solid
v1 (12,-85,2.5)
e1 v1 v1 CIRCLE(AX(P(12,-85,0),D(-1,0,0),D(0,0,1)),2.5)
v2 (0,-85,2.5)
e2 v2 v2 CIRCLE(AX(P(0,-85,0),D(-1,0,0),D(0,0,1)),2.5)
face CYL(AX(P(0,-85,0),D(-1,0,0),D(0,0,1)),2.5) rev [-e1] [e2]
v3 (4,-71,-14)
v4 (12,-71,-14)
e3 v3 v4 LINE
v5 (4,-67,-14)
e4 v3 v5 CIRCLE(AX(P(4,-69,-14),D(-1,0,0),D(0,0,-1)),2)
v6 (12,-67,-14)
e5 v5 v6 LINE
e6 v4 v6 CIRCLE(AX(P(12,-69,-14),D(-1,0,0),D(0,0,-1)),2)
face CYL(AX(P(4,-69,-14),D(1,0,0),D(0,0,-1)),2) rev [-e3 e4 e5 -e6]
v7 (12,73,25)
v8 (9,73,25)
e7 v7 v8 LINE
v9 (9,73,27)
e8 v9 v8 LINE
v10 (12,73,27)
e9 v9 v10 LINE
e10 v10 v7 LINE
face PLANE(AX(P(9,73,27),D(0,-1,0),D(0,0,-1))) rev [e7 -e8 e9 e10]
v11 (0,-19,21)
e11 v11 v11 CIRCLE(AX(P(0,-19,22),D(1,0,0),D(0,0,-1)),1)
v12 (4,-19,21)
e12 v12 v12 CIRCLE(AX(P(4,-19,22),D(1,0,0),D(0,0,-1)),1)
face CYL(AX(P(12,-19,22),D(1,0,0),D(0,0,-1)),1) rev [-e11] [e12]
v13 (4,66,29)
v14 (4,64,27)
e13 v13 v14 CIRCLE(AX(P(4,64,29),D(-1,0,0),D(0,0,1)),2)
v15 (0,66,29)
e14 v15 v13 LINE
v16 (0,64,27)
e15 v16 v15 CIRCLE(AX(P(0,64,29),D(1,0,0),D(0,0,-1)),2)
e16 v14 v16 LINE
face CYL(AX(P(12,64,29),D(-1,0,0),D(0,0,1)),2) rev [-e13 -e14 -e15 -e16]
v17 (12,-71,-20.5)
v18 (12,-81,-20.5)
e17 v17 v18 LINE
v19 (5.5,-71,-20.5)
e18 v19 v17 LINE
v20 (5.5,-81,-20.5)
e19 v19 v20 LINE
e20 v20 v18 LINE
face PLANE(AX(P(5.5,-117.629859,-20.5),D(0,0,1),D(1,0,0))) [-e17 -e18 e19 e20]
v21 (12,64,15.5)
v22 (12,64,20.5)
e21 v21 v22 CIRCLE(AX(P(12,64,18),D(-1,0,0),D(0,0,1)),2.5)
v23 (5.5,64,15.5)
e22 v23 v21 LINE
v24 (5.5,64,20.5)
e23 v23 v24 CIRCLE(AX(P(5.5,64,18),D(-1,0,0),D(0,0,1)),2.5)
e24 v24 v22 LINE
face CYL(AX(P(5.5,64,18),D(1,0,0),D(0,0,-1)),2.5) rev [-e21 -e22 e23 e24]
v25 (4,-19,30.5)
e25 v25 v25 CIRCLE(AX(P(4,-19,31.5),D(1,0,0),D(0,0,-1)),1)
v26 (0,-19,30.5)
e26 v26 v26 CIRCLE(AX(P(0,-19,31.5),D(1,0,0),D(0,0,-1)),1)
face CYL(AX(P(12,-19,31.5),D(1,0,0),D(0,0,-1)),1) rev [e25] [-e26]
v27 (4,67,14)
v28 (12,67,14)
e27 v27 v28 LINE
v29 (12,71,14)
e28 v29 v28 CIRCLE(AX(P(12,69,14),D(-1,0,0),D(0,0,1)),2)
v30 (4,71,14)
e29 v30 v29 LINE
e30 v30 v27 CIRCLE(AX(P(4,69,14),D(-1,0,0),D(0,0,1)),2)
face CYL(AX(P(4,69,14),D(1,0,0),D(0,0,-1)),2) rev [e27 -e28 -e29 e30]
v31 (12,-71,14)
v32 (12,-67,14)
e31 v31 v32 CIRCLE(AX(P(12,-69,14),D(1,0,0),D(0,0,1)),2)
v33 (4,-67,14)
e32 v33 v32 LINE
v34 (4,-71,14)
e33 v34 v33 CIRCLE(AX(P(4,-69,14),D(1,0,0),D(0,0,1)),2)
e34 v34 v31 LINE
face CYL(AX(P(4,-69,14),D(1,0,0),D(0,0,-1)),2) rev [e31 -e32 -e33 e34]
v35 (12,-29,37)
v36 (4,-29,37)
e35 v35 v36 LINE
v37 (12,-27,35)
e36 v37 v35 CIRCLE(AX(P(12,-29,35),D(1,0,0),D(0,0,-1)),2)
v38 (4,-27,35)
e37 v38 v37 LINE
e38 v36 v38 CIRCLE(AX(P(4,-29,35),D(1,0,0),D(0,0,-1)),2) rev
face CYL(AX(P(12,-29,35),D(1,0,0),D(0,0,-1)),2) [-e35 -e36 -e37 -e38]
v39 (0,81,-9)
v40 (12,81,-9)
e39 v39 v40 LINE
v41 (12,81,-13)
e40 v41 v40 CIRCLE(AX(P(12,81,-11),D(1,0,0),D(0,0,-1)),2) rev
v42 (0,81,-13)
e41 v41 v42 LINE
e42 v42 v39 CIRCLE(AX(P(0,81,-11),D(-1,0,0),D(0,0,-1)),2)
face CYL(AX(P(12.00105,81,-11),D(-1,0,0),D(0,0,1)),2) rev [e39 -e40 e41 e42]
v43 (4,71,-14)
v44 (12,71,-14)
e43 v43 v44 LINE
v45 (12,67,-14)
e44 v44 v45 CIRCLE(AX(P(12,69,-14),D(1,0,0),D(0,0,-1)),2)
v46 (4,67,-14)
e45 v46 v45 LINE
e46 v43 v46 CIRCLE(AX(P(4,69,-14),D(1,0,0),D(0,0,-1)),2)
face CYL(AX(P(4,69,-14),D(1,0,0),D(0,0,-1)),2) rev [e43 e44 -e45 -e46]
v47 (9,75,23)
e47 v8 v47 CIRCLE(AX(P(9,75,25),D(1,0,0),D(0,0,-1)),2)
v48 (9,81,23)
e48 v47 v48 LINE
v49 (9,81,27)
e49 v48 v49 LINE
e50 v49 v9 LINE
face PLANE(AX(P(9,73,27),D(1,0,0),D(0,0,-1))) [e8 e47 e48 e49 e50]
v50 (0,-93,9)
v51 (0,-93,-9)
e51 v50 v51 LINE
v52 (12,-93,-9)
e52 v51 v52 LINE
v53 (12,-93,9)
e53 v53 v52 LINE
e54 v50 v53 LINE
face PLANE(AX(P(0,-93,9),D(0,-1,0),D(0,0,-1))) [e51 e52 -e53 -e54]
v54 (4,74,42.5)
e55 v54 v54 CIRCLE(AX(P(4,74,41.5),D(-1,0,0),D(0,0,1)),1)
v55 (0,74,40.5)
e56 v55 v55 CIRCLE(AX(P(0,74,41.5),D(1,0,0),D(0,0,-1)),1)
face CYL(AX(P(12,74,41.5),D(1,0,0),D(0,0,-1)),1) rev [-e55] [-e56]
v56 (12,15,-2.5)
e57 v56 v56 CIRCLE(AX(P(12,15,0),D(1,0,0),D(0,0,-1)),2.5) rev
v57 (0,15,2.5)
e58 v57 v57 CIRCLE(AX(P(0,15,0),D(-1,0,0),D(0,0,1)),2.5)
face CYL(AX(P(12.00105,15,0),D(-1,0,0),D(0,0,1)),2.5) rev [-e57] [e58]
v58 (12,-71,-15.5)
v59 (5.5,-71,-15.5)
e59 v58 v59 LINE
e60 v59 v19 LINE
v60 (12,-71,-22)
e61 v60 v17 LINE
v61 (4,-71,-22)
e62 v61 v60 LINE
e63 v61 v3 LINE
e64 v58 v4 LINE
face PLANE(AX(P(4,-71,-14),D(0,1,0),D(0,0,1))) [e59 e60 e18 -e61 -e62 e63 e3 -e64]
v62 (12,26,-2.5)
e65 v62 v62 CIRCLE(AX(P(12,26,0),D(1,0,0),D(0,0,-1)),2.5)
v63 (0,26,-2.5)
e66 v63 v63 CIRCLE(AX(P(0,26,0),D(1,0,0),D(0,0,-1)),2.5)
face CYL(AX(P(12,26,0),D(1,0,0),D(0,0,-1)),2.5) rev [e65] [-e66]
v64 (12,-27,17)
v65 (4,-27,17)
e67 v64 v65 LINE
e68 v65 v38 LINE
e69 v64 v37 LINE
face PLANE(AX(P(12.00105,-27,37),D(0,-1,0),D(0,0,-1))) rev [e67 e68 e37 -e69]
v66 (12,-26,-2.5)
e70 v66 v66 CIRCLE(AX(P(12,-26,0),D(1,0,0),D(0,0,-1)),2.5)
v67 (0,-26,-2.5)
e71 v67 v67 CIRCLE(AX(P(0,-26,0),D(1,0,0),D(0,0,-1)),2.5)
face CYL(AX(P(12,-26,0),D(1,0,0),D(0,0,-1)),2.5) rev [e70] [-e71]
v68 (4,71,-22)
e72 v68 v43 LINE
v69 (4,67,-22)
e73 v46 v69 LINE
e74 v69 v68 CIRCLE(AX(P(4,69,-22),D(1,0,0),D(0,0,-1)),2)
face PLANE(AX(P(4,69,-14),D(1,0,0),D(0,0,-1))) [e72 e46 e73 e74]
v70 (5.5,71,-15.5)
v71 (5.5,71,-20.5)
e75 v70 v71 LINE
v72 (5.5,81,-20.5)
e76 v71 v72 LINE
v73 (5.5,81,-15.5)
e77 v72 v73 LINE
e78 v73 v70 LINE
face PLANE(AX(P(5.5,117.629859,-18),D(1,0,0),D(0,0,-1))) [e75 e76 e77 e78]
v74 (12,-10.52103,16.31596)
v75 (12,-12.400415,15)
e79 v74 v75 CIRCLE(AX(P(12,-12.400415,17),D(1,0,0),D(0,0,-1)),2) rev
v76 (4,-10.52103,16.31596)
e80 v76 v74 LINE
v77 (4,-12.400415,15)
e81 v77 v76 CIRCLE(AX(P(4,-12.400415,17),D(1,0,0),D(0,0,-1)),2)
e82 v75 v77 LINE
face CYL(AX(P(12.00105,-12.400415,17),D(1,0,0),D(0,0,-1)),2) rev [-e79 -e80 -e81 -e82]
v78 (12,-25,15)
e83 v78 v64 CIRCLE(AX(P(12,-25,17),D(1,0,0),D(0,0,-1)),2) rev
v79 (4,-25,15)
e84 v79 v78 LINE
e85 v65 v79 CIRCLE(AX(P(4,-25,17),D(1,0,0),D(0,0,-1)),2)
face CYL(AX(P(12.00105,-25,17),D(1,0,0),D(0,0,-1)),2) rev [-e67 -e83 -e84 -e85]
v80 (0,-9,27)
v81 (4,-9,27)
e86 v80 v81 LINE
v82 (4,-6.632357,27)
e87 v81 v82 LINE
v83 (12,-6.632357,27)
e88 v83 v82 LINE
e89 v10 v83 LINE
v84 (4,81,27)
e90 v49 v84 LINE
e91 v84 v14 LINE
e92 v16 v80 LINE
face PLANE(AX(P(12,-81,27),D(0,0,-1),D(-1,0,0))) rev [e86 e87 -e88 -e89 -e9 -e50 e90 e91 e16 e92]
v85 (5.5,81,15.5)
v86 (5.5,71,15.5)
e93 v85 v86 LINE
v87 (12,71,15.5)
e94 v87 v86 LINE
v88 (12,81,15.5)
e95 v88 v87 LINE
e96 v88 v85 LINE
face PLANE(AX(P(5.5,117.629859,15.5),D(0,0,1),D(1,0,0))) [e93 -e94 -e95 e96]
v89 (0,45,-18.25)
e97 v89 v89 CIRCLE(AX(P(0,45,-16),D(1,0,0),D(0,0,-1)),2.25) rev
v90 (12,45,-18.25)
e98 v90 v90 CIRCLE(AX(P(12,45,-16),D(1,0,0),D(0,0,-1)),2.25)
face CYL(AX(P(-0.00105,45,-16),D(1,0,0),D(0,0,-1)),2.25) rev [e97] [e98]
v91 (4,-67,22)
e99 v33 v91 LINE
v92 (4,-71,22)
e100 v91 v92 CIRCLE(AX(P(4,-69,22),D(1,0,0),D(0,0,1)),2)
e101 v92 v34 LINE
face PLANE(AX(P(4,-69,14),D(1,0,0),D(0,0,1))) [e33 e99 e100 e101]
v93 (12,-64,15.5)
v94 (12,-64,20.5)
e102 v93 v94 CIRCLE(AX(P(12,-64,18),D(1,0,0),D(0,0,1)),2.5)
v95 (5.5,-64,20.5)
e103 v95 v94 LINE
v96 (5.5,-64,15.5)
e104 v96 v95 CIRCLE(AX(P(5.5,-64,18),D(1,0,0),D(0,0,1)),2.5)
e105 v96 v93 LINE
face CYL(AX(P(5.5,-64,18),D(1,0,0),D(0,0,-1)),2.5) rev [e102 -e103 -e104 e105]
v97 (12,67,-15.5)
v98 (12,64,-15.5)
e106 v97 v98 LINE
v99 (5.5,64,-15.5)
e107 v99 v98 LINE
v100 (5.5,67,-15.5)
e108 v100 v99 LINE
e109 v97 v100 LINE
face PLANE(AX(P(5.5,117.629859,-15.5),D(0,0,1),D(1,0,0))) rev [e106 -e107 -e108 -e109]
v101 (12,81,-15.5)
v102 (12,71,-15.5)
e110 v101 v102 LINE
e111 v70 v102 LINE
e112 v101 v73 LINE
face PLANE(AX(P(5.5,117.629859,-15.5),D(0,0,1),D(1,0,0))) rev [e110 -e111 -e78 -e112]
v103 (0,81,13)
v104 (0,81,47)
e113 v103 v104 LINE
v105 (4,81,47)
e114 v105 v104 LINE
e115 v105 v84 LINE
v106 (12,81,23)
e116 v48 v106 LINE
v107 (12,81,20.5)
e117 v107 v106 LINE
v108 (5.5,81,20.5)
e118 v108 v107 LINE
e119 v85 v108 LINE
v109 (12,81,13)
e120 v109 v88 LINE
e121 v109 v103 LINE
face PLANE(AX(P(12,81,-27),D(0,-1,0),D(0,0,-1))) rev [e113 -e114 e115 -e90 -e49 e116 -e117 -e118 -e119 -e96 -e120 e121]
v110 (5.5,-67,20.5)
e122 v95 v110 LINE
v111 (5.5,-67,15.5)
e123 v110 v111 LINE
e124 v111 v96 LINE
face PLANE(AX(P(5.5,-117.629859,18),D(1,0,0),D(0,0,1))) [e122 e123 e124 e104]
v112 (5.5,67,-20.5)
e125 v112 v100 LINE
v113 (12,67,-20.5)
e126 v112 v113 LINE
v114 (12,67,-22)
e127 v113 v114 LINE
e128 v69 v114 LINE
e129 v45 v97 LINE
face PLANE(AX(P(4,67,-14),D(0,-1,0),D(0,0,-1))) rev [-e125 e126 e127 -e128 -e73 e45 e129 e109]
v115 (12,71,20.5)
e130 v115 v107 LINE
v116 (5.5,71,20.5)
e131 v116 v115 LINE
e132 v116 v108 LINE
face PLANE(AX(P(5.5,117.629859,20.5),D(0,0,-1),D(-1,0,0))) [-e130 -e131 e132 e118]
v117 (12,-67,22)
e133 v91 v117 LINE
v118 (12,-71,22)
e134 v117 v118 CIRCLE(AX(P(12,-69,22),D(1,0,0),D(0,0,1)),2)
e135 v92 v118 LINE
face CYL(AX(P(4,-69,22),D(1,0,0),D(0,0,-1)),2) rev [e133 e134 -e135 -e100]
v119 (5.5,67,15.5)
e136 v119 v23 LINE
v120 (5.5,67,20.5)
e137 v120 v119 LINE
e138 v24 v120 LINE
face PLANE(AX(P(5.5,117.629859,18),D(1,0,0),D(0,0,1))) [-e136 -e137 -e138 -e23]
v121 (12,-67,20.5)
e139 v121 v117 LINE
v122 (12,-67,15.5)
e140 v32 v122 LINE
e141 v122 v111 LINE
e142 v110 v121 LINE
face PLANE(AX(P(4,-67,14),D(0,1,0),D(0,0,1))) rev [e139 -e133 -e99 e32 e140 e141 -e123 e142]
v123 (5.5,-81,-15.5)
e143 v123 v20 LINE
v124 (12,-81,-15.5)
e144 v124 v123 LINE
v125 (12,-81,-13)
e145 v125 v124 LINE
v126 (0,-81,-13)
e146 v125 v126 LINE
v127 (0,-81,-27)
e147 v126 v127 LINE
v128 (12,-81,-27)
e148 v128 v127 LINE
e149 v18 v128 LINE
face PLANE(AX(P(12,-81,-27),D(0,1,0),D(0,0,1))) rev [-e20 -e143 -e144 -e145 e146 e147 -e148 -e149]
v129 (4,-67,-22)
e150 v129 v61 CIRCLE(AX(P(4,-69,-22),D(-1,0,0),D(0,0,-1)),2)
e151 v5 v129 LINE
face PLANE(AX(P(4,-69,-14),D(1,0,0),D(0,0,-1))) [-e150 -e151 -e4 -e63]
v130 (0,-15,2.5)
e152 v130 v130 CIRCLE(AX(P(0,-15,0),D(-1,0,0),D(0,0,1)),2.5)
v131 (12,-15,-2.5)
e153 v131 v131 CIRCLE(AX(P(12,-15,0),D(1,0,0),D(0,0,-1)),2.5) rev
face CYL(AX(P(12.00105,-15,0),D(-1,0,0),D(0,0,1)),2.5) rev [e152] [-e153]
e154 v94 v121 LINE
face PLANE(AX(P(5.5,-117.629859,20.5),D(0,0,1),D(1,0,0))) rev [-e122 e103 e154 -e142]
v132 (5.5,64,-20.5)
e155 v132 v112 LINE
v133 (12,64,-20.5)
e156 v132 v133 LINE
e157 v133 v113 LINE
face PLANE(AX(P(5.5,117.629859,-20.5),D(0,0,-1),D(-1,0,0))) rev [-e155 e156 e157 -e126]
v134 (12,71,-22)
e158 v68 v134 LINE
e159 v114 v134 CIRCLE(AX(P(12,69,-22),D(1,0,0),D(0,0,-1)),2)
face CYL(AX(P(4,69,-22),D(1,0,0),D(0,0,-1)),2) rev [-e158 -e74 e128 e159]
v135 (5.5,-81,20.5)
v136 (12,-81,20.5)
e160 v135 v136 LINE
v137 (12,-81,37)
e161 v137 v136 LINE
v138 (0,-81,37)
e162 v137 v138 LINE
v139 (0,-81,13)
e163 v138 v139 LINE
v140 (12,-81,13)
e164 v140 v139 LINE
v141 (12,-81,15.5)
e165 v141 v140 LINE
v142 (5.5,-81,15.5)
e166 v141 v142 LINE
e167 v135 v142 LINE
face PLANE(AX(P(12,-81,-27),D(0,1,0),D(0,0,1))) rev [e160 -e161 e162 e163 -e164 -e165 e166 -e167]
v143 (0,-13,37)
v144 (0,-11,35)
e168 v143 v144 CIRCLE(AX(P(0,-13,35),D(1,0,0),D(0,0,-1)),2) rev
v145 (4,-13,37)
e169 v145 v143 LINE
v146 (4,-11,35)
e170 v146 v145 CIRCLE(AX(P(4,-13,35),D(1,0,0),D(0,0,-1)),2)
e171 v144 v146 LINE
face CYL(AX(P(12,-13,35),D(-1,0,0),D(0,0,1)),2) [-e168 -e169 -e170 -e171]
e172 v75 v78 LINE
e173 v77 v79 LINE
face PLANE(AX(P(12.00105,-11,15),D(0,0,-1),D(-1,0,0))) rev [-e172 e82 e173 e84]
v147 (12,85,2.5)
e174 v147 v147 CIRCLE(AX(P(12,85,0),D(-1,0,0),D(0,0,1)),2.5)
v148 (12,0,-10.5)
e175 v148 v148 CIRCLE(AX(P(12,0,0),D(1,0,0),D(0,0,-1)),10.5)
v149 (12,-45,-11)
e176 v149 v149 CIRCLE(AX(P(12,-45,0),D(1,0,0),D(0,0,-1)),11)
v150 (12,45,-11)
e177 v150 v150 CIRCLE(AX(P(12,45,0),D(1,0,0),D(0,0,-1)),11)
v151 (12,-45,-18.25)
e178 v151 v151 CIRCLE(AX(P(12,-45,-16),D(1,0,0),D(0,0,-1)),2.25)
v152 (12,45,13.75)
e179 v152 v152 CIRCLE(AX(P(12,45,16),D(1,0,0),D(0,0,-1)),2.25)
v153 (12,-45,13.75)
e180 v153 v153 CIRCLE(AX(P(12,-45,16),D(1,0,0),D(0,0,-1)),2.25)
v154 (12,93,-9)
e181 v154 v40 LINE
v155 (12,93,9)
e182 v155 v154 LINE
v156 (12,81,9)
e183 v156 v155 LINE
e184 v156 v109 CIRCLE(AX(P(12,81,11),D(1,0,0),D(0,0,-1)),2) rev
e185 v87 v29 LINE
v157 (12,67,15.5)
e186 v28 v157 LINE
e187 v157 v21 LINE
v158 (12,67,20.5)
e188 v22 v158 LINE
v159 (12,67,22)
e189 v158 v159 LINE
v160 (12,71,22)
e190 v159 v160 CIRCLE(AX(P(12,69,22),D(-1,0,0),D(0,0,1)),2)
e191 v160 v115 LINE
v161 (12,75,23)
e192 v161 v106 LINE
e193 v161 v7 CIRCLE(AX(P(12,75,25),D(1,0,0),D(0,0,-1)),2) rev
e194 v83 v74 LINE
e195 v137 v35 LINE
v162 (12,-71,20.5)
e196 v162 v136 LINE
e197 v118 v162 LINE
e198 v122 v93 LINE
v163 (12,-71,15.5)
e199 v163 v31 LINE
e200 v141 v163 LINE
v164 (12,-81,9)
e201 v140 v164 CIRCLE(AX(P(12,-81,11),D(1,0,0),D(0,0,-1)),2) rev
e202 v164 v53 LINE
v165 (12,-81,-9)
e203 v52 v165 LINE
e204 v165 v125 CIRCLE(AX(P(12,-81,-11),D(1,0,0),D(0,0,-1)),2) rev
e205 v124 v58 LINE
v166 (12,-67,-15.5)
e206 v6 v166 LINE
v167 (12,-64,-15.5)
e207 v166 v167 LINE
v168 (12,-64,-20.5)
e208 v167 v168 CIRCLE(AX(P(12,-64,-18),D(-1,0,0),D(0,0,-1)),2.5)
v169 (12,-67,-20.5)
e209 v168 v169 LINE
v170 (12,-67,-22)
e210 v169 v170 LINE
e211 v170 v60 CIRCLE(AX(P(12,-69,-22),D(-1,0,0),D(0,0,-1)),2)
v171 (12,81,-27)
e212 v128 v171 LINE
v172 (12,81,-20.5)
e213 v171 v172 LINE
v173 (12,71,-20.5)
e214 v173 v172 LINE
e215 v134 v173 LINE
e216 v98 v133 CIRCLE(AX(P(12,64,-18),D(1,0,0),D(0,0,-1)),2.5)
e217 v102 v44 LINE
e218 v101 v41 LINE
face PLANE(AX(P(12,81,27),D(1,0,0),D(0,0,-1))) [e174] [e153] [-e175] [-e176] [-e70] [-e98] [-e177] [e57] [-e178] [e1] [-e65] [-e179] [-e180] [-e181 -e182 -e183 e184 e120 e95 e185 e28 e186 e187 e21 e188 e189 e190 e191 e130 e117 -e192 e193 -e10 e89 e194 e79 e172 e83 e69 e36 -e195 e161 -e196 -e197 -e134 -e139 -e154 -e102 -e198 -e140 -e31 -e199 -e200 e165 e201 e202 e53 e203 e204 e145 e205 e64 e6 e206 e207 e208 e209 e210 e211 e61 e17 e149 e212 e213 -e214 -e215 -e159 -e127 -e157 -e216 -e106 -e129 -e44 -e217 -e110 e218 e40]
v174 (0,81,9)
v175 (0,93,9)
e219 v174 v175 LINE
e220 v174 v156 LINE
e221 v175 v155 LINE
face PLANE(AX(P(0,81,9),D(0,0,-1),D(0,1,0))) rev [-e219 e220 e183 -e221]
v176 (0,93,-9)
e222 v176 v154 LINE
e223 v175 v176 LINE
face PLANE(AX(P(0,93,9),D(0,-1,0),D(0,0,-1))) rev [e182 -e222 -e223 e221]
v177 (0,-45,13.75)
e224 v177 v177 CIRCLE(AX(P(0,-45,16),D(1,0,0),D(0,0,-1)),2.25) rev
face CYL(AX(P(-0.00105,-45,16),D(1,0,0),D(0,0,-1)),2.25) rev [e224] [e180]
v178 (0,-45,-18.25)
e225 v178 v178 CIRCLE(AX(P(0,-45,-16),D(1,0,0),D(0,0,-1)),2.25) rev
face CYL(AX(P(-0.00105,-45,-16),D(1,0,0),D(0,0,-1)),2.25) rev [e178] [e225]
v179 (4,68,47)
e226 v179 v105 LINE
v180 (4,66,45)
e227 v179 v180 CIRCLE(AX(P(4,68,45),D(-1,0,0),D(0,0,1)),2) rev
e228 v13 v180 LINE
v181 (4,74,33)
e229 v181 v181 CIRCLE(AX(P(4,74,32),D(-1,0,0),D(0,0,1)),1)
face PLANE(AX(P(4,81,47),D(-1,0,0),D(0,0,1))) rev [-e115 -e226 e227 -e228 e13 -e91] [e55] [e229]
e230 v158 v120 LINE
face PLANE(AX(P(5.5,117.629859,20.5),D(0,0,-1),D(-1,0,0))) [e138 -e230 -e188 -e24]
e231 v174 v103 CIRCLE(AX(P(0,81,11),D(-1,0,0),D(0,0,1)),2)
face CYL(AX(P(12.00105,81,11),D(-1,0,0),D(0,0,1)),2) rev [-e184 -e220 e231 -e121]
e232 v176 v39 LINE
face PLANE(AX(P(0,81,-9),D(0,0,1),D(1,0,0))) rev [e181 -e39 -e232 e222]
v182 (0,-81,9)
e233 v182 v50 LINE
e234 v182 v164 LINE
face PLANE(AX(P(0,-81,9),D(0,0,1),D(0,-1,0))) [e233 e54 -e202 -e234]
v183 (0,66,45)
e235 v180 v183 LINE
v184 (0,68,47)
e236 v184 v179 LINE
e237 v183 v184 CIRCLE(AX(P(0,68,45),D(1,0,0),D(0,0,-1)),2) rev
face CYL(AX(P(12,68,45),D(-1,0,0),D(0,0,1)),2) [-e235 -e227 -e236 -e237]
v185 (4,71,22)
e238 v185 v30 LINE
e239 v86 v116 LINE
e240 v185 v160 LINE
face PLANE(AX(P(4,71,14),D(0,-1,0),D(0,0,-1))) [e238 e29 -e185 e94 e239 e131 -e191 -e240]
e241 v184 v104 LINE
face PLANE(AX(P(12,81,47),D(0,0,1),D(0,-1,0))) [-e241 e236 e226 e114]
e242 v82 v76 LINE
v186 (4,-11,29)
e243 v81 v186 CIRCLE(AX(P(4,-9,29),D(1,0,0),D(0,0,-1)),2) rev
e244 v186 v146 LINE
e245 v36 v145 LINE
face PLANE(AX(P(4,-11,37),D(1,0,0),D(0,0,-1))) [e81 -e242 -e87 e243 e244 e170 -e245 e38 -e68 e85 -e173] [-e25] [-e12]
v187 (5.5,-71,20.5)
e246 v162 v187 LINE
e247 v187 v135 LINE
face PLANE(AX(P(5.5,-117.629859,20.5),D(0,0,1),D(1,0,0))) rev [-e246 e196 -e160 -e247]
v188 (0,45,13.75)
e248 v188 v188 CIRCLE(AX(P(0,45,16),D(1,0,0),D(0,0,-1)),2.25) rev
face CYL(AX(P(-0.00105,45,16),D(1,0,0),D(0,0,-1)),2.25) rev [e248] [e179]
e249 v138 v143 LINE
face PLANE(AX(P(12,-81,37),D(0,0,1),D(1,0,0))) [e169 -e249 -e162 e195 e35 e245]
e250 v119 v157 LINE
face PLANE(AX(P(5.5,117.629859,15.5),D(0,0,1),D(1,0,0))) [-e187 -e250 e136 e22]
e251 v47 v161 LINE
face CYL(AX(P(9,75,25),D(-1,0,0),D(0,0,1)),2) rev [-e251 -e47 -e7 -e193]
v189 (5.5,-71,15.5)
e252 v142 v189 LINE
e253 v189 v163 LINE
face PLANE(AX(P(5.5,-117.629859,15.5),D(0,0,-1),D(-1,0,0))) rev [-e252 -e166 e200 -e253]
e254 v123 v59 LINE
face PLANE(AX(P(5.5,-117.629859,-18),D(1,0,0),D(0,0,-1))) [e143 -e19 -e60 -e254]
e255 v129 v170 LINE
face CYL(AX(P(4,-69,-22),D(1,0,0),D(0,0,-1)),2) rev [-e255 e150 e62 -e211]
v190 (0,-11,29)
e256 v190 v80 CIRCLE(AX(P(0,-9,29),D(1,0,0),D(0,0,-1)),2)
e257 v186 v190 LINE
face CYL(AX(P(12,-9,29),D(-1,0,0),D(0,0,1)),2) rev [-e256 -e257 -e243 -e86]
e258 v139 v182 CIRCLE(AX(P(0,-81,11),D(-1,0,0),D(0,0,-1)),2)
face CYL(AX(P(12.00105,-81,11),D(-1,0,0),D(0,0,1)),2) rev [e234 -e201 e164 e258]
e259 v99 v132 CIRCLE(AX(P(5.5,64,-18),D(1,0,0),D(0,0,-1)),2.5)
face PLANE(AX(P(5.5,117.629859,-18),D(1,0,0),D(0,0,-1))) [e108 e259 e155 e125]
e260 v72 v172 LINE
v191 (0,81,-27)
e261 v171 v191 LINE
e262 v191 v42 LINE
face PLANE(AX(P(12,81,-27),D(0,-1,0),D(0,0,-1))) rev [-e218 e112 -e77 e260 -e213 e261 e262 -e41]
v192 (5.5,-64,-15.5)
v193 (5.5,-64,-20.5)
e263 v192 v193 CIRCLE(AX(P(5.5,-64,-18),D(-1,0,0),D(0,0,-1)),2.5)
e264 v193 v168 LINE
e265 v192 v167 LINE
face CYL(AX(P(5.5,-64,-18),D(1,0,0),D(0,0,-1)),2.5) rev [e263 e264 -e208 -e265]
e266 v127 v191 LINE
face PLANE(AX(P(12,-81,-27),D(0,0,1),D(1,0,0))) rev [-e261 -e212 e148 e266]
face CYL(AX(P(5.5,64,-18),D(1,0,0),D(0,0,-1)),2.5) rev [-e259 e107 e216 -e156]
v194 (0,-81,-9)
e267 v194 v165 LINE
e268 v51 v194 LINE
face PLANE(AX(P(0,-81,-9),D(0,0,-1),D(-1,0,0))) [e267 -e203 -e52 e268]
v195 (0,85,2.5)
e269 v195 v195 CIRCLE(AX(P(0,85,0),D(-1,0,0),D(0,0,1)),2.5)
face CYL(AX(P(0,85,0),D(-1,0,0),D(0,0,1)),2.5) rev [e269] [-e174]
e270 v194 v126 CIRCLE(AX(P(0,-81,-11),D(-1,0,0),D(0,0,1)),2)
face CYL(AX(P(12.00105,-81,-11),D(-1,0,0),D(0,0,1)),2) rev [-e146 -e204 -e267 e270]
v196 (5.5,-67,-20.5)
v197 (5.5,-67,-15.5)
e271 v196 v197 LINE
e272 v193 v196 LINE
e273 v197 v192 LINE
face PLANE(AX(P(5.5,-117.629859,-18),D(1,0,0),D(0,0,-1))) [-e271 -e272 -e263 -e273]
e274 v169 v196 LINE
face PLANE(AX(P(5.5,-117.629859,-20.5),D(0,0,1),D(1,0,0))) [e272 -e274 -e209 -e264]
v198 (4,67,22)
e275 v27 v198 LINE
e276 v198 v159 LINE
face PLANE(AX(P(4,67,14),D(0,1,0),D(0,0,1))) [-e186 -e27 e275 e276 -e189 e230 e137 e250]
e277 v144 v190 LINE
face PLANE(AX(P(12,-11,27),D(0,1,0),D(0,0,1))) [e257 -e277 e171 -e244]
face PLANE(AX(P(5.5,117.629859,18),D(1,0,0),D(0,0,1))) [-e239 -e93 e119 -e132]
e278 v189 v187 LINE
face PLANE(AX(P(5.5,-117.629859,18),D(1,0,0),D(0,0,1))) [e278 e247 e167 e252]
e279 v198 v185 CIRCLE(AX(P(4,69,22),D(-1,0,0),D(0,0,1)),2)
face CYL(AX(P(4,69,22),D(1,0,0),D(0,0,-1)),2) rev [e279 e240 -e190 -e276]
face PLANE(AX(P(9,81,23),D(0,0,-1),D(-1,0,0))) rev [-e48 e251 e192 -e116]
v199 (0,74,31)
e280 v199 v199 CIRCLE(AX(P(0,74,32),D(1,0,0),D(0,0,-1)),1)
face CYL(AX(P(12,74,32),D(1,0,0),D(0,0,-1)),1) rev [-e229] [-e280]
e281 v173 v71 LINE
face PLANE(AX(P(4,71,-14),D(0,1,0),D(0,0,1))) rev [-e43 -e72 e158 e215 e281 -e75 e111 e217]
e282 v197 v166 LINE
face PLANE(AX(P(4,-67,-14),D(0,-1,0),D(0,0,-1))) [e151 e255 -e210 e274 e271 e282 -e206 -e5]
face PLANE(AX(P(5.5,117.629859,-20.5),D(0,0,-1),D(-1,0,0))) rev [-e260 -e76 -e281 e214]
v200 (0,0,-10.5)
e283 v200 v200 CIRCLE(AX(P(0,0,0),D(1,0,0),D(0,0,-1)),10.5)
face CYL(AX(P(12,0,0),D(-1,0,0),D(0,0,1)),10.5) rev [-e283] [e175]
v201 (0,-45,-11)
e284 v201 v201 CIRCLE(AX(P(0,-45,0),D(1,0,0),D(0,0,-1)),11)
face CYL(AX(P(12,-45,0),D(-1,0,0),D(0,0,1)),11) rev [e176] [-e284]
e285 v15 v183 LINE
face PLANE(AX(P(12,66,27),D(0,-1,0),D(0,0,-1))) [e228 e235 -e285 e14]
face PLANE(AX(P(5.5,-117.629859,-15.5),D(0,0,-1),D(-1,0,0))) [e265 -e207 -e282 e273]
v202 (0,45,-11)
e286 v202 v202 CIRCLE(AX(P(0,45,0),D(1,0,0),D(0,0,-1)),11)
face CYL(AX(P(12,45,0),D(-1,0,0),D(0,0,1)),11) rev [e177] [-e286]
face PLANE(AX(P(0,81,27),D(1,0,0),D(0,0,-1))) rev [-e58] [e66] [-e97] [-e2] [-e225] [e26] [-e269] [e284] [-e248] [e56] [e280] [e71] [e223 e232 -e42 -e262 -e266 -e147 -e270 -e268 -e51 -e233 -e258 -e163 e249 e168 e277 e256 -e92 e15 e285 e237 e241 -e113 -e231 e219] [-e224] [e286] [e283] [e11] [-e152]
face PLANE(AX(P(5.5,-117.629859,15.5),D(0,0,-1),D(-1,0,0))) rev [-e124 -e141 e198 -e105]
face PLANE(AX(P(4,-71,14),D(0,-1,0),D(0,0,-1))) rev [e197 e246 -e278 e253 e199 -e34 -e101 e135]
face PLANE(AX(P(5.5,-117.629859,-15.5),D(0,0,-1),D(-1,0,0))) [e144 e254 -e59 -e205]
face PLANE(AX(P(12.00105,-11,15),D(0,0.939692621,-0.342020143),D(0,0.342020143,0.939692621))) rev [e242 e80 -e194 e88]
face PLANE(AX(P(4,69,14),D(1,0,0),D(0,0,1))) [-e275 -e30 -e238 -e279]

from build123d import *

# Parameters (mm, degrees)
SKETCH2_W                    = 54
SKETCH2_H                    = 162
SKETCH2_R                    = 10.5
SKETCH2_R_2                  = 11
BOSS_EXTRUDE1_DEPTH          = 12
SKETCH3_W                    = 18
SKETCH3_H                    = 12
BOSS_EXTRUDE2_DEPTH          = 12
CUT_EXTRUDE1_REACH           = 99.581
SKETCH4_R                    = 2.25
LPATTERN1_COUNT              = 2
LPATTERN1_PITCH              = 90
CUT_EXTRUDE14_START          = 4
CUT_EXTRUDE14_DEPTH          = 8
CUT_EXTRUDE15_DEPTH          = 6.5
MIRROR2_START                = 4
MIRROR2_COPY_1_DEPTH         = 8
MIRROR2_COPY_2_DEPTH         = 6.5
CUT_EXTRUDE9_REACH           = 99.581
SKETCH13_R                   = 2.5
SKETCH15_W                   = 20
SKETCH15_H                   = 15
BOSS_EXTRUDE3_DEPTH          = 12
F_2_0_2_DIAMETER_HOLE1_D     = 2
SKETCH19_W                   = 10
SKETCH19_H                   = 70
BOSS_EXTRUDE4_DEPTH          = 12
F_2_0_2_DIAMETER_HOLE2_D     = 2
CUT_EXTRUDE12_REACH          = 110.89
CUT_EXTRUDE12_START          = -4
SKETCH22_W                   = 20
SKETCH22_H                   = 15
FILLET1_R                    = 2
CUT_EXTRUDE13_REACH          = 106.89
F_5_0_5_DIAMETER_HOLE2_D     = 5
F_5_0_5_DIAMETER_HOLE1_D     = 5
F_5_0_5_DIAMETER_HOLE1_DEPTH = 12
F_5_0_5_DIAMETER_HOLE1_TIP   = 1.502151548
SKETCH32_W                   = 4
SKETCH32_H                   = 8
CUT_EXTRUDE16_DEPTH          = 3
FILLET2_R                    = 2


# Read off the part's stored shape, not the designer's step: Cut-Extrude14
with BuildPart() as part:
    # Sketch2 → Boss-Extrude1 (new body)
    with BuildSketch(Plane(origin=(0, 0, 0), x_dir=(0, 0, -1), z_dir=(1, 0, 0))):
        Rectangle(SKETCH2_W, SKETCH2_H)
        Circle(SKETCH2_R, mode=Mode.SUBTRACT)
        with Locations((0, 45)):
            Circle(SKETCH2_R_2, mode=Mode.SUBTRACT)
        with Locations((0, -45)):
            Circle(SKETCH2_R_2, mode=Mode.SUBTRACT)
    extrude(amount=BOSS_EXTRUDE1_DEPTH)

    # Sketch3 → Boss-Extrude2 (add)
    with BuildSketch(Plane(origin=(12, 0, 0), x_dir=(0, 0, -1), z_dir=(1, 0, 0))):
        with Locations((0, -87)):
            Rectangle(SKETCH3_W, SKETCH3_H)
    boss_extrude2 = extrude(amount=-BOSS_EXTRUDE2_DEPTH)

    # Mirror1: Boss-Extrude2 across plane
    add(boss_extrude2.mirror(Plane.ZX))

    # Sketch4 → Cut-Extrude1 (cut, up to next)
    with BuildSketch(Plane(origin=(12, 0, 0), x_dir=(0, 0, -1), z_dir=(1, 0, 0)), mode=Mode.PRIVATE) as cut_extrude1_sk1:
        with Locations((-16, -45)):
            Circle(SKETCH4_R)
    cut_extrude1_tool1 = extrude(cut_extrude1_sk1.sketch, amount=-CUT_EXTRUDE1_REACH, mode=Mode.PRIVATE) & part.part
    # Sketch4 → Cut-Extrude1 (cut, up to next)
    with BuildSketch(Plane(origin=(12, 0, 0), x_dir=(0, 0, -1), z_dir=(1, 0, 0)), mode=Mode.PRIVATE) as cut_extrude1_sk2:
        with Locations((16, -45)):
            Circle(SKETCH4_R)
    cut_extrude1_tool2 = extrude(cut_extrude1_sk2.sketch, amount=-CUT_EXTRUDE1_REACH, mode=Mode.PRIVATE) & part.part
    cut_extrude1_1 = cut_extrude1_tool1.solids().sort_by_distance((12, -45, 16))[0]
    add(cut_extrude1_1, mode=Mode.SUBTRACT)
    cut_extrude1_2 = cut_extrude1_tool2.solids().sort_by_distance((12, -45, -16))[0]
    add(cut_extrude1_2, mode=Mode.SUBTRACT)
    cut_extrude1 = cut_extrude1_1 + cut_extrude1_2  # Cut-Extrude1 as one shape, for the pattern or mirror that repeats it

    # LPattern1: Cut-Extrude1 ×2
    with Locations(*[(0, i * LPATTERN1_PITCH, 0) for i in range(1, LPATTERN1_COUNT)]):
        add(cut_extrude1, mode=Mode.SUBTRACT)

    # Cut-Extrude14 outline → Cut-Extrude14 (cut)
    with BuildSketch(Plane.YZ.offset(CUT_EXTRUDE14_START)):
        with BuildLine():
            Line((71, -22), (71, -14))
            ThreePointArc((71, -14), (69, -12), (67, -14))
            Line((67, -14), (67, -22))
            ThreePointArc((67, -22), (69, -24), (71, -22))
        make_face()
    cut_extrude14 = extrude(amount=CUT_EXTRUDE14_DEPTH, mode=Mode.SUBTRACT)

    # Sketch27 → Cut-Extrude15 (cut)
    with BuildSketch(Plane(origin=(12, 165.584173165, 19.767626803), x_dir=(0, 0, -1), z_dir=(1, 0, 0))):
        with BuildLine():
            Line((40.267626803, -47.95431377), (40.267626803, -101.584173165))
            ThreePointArc((40.267626803, -101.584173165), (37.767626803, -104.084173165), (35.267626803, -101.584173165))
            Line((35.267626803, -101.584173165), (35.267626803, -47.95431377))
            ThreePointArc((35.267626803, -47.95431377), (37.767626803, -45.45431377), (40.267626803, -47.95431377))
        make_face()
    cut_extrude15 = extrude(amount=-CUT_EXTRUDE15_DEPTH, mode=Mode.SUBTRACT)

    # Mirror3: Cut-Extrude14, Cut-Extrude15 across plane
    add(cut_extrude14.mirror(Plane.XY), mode=Mode.SUBTRACT)
    add(cut_extrude15.mirror(Plane.XY), mode=Mode.SUBTRACT)

    # Mirror2: Cut-Extrude14, Cut-Extrude15 across plane
    add(cut_extrude14.mirror(Plane.ZX), mode=Mode.SUBTRACT)
    add(cut_extrude15.mirror(Plane.ZX), mode=Mode.SUBTRACT)

    # Mirror2 copy 1 sketch → Mirror2 copy 1 (cut)
    with BuildSketch(Plane(origin=(0, 0, 0), x_dir=(0, -1, 0), z_dir=(1, 0, 0)).offset(MIRROR2_START)):
        with BuildLine():
            Line((71, -22), (71, -14))
            ThreePointArc((71, -14), (69, -12), (67, -14))
            Line((67, -14), (67, -22))
            ThreePointArc((67, -22), (69, -24), (71, -22))
        make_face()
    extrude(amount=MIRROR2_COPY_1_DEPTH, mode=Mode.SUBTRACT)

    # Mirror2 copy 2 sketch → Mirror2 copy 2 (cut)
    with BuildSketch(Plane(origin=(12, -165.584173165, -19.767626803), x_dir=(0, 0, 1), z_dir=(1, 0, 0))):
        with BuildLine():
            Line((40.267626803, -47.95431377), (40.267626803, -101.584173165))
            ThreePointArc((40.267626803, -101.584173165), (37.767626803, -104.084173165), (35.267626803, -101.584173165))
            Line((35.267626803, -101.584173165), (35.267626803, -47.95431377))
            ThreePointArc((35.267626803, -47.95431377), (37.767626803, -45.45431377), (40.267626803, -47.95431377))
        make_face()
    extrude(amount=-MIRROR2_COPY_2_DEPTH, mode=Mode.SUBTRACT)

    # Sketch13 → Cut-Extrude9 (cut, up to next)
    with BuildSketch(Plane.ZY, mode=Mode.PRIVATE) as cut_extrude9_sk1:
        with Locations((0, 15)):
            Circle(SKETCH13_R)
    cut_extrude9_tool1 = extrude(cut_extrude9_sk1.sketch, amount=-CUT_EXTRUDE9_REACH, mode=Mode.PRIVATE) & part.part
    # Sketch13 → Cut-Extrude9 (cut, up to next)
    with BuildSketch(Plane.ZY, mode=Mode.PRIVATE) as cut_extrude9_sk2:
        with Locations((0, -15)):
            Circle(SKETCH13_R)
    cut_extrude9_tool2 = extrude(cut_extrude9_sk2.sketch, amount=-CUT_EXTRUDE9_REACH, mode=Mode.PRIVATE) & part.part
    add(cut_extrude9_tool1.solids().sort_by_distance((0, 15, 0))[0], mode=Mode.SUBTRACT)
    add(cut_extrude9_tool2.solids().sort_by_distance((0, -15, 0))[0], mode=Mode.SUBTRACT)

    # Sketch15 → Boss-Extrude3 (add)
    with BuildSketch(Plane.ZY):
        with Locations((37, 73.5)):
            Rectangle(SKETCH15_W, SKETCH15_H)
    extrude(amount=-BOSS_EXTRUDE3_DEPTH)

    # Ø2.0 (2) Diameter Hole1 (through all)
    with Locations(Plane(origin=(12, 0, 0), x_dir=(0, 0, -1), z_dir=(1, 0, 0))):
        with Locations((-41.5, 74), (-32, 74)):
            Hole(F_2_0_2_DIAMETER_HOLE1_D / 2)

    # Sketch19 → Boss-Extrude4 (add)
    with BuildSketch(Plane.ZY):
        with Locations((32, -46)):
            Rectangle(SKETCH19_W, SKETCH19_H)
    extrude(amount=-BOSS_EXTRUDE4_DEPTH)

    # Ø2.0 (2) Diameter Hole2 (through all)
    with Locations(Plane(origin=(12, 0, 0), x_dir=(0, 0, -1), z_dir=(1, 0, 0))):
        with Locations((-31.5, -19), (-22, -19)):
            Hole(F_2_0_2_DIAMETER_HOLE2_D / 2)

    # Sketch22 → Cut-Extrude12 (cut, up to next)
    with BuildSketch(Plane.ZY.offset(CUT_EXTRUDE12_START), mode=Mode.PRIVATE) as cut_extrude12_sk1:
        with Locations((37, 73.5)):
            Rectangle(SKETCH22_W, SKETCH22_H)
    cut_extrude12_tool1 = extrude(cut_extrude12_sk1.sketch, amount=-CUT_EXTRUDE12_REACH, mode=Mode.PRIVATE) & part.part
    # Sketch22 → Cut-Extrude12 (cut, up to next)
    with BuildSketch(Plane.ZY.offset(CUT_EXTRUDE12_START), mode=Mode.PRIVATE) as cut_extrude12_sk2:
        Polygon((15, -11), (27, -6.632357189), (37, -11), (37, -27), (15, -27), align=None)
    cut_extrude12_tool2 = extrude(cut_extrude12_sk2.sketch, amount=-CUT_EXTRUDE12_REACH, mode=Mode.PRIVATE) & part.part
    add(cut_extrude12_tool1.solids().sort_by_distance((4, 73.5, 37))[0], mode=Mode.SUBTRACT)
    add(cut_extrude12_tool2.solids().sort_by_distance((4, -17.864378, 26.040032))[0], mode=Mode.SUBTRACT)

    # Fillet1
    fillet1_edges = [part.edges().sort_by_distance(p)[0] for p in [
        (8, -11, 15),
        (8, -27, 15),
        (2, 66, 27),
        (2, -11, 27),
        (2, 66, 47),
        (2, -11, 37),
        (8, -27, 37),
    ]]
    fillet(fillet1_edges, radius=FILLET1_R)

    # Sketch23 → Cut-Extrude13 (cut, up to next)
    with BuildSketch(Plane.ZY, mode=Mode.PRIVATE) as cut_extrude13_sk1:
        with BuildLine():
            Line((-13, 81), (-9, 81))
            ThreePointArc((-9, 81), (-11, 79), (-13, 81))
        make_face()
    cut_extrude13_tool1 = extrude(cut_extrude13_sk1.sketch, amount=-CUT_EXTRUDE13_REACH, mode=Mode.PRIVATE) & part.part
    # Sketch23 → Cut-Extrude13 (cut, up to next)
    with BuildSketch(Plane.ZY, mode=Mode.PRIVATE) as cut_extrude13_sk2:
        with BuildLine():
            Line((9, 81), (13, 81))
            ThreePointArc((13, 81), (11, 79), (9, 81))
        make_face()
    cut_extrude13_tool2 = extrude(cut_extrude13_sk2.sketch, amount=-CUT_EXTRUDE13_REACH, mode=Mode.PRIVATE) & part.part
    # Sketch23 → Cut-Extrude13 (cut, up to next)
    with BuildSketch(Plane.ZY, mode=Mode.PRIVATE) as cut_extrude13_sk3:
        with BuildLine():
            Line((-13, -81), (-9, -81))
            ThreePointArc((-9, -81), (-11, -79), (-13, -81))
        make_face()
    cut_extrude13_tool3 = extrude(cut_extrude13_sk3.sketch, amount=-CUT_EXTRUDE13_REACH, mode=Mode.PRIVATE) & part.part
    # Sketch23 → Cut-Extrude13 (cut, up to next)
    with BuildSketch(Plane.ZY, mode=Mode.PRIVATE) as cut_extrude13_sk4:
        with BuildLine():
            Line((9, -81), (13, -81))
            ThreePointArc((13, -81), (11, -79), (9, -81))
        make_face()
    cut_extrude13_tool4 = extrude(cut_extrude13_sk4.sketch, amount=-CUT_EXTRUDE13_REACH, mode=Mode.PRIVATE) & part.part
    add(cut_extrude13_tool1.solids().sort_by_distance((0, 80.151174, -11))[0], mode=Mode.SUBTRACT)
    add(cut_extrude13_tool2.solids().sort_by_distance((0, 80.151174, 11))[0], mode=Mode.SUBTRACT)
    add(cut_extrude13_tool3.solids().sort_by_distance((0, -80.151174, -11))[0], mode=Mode.SUBTRACT)
    add(cut_extrude13_tool4.solids().sort_by_distance((0, -80.151174, 11))[0], mode=Mode.SUBTRACT)

    # Ø5.0 (5) Diameter Hole2 (through all)
    with Locations(Plane(origin=(12, 0, 0), x_dir=(0, 0, -1), z_dir=(1, 0, 0))):
        with Locations((0, -26), (0, 26)):
            Hole(F_5_0_5_DIAMETER_HOLE2_D / 2)

    # Ø5.0 (5) Diameter Hole1
    with Locations(Plane.ZY):
        with Locations((0, 85), (0, -85)):
            Hole(F_5_0_5_DIAMETER_HOLE1_D / 2, depth=F_5_0_5_DIAMETER_HOLE1_DEPTH)
            with Locations((0, 0, -(F_5_0_5_DIAMETER_HOLE1_DEPTH + F_5_0_5_DIAMETER_HOLE1_TIP / 2))):  # 118° drill point
                Cone(0, F_5_0_5_DIAMETER_HOLE1_D / 2, F_5_0_5_DIAMETER_HOLE1_TIP, mode=Mode.SUBTRACT)

    # Sketch32 → Cut-Extrude16 (cut)
    with BuildSketch(Plane(origin=(12, 0, 0), x_dir=(0, 0, -1), z_dir=(1, 0, 0))):
        with Locations((-25, 77)):
            Rectangle(SKETCH32_W, SKETCH32_H)
    extrude(amount=-CUT_EXTRUDE16_DEPTH, mode=Mode.SUBTRACT)

    # Fillet2
    fillet2_edges = [part.edges().sort_by_distance(p)[0] for p in [
        (10.5, 73, 23),
    ]]
    fillet(fillet2_edges, radius=FILLET2_R)


solid = part.part
